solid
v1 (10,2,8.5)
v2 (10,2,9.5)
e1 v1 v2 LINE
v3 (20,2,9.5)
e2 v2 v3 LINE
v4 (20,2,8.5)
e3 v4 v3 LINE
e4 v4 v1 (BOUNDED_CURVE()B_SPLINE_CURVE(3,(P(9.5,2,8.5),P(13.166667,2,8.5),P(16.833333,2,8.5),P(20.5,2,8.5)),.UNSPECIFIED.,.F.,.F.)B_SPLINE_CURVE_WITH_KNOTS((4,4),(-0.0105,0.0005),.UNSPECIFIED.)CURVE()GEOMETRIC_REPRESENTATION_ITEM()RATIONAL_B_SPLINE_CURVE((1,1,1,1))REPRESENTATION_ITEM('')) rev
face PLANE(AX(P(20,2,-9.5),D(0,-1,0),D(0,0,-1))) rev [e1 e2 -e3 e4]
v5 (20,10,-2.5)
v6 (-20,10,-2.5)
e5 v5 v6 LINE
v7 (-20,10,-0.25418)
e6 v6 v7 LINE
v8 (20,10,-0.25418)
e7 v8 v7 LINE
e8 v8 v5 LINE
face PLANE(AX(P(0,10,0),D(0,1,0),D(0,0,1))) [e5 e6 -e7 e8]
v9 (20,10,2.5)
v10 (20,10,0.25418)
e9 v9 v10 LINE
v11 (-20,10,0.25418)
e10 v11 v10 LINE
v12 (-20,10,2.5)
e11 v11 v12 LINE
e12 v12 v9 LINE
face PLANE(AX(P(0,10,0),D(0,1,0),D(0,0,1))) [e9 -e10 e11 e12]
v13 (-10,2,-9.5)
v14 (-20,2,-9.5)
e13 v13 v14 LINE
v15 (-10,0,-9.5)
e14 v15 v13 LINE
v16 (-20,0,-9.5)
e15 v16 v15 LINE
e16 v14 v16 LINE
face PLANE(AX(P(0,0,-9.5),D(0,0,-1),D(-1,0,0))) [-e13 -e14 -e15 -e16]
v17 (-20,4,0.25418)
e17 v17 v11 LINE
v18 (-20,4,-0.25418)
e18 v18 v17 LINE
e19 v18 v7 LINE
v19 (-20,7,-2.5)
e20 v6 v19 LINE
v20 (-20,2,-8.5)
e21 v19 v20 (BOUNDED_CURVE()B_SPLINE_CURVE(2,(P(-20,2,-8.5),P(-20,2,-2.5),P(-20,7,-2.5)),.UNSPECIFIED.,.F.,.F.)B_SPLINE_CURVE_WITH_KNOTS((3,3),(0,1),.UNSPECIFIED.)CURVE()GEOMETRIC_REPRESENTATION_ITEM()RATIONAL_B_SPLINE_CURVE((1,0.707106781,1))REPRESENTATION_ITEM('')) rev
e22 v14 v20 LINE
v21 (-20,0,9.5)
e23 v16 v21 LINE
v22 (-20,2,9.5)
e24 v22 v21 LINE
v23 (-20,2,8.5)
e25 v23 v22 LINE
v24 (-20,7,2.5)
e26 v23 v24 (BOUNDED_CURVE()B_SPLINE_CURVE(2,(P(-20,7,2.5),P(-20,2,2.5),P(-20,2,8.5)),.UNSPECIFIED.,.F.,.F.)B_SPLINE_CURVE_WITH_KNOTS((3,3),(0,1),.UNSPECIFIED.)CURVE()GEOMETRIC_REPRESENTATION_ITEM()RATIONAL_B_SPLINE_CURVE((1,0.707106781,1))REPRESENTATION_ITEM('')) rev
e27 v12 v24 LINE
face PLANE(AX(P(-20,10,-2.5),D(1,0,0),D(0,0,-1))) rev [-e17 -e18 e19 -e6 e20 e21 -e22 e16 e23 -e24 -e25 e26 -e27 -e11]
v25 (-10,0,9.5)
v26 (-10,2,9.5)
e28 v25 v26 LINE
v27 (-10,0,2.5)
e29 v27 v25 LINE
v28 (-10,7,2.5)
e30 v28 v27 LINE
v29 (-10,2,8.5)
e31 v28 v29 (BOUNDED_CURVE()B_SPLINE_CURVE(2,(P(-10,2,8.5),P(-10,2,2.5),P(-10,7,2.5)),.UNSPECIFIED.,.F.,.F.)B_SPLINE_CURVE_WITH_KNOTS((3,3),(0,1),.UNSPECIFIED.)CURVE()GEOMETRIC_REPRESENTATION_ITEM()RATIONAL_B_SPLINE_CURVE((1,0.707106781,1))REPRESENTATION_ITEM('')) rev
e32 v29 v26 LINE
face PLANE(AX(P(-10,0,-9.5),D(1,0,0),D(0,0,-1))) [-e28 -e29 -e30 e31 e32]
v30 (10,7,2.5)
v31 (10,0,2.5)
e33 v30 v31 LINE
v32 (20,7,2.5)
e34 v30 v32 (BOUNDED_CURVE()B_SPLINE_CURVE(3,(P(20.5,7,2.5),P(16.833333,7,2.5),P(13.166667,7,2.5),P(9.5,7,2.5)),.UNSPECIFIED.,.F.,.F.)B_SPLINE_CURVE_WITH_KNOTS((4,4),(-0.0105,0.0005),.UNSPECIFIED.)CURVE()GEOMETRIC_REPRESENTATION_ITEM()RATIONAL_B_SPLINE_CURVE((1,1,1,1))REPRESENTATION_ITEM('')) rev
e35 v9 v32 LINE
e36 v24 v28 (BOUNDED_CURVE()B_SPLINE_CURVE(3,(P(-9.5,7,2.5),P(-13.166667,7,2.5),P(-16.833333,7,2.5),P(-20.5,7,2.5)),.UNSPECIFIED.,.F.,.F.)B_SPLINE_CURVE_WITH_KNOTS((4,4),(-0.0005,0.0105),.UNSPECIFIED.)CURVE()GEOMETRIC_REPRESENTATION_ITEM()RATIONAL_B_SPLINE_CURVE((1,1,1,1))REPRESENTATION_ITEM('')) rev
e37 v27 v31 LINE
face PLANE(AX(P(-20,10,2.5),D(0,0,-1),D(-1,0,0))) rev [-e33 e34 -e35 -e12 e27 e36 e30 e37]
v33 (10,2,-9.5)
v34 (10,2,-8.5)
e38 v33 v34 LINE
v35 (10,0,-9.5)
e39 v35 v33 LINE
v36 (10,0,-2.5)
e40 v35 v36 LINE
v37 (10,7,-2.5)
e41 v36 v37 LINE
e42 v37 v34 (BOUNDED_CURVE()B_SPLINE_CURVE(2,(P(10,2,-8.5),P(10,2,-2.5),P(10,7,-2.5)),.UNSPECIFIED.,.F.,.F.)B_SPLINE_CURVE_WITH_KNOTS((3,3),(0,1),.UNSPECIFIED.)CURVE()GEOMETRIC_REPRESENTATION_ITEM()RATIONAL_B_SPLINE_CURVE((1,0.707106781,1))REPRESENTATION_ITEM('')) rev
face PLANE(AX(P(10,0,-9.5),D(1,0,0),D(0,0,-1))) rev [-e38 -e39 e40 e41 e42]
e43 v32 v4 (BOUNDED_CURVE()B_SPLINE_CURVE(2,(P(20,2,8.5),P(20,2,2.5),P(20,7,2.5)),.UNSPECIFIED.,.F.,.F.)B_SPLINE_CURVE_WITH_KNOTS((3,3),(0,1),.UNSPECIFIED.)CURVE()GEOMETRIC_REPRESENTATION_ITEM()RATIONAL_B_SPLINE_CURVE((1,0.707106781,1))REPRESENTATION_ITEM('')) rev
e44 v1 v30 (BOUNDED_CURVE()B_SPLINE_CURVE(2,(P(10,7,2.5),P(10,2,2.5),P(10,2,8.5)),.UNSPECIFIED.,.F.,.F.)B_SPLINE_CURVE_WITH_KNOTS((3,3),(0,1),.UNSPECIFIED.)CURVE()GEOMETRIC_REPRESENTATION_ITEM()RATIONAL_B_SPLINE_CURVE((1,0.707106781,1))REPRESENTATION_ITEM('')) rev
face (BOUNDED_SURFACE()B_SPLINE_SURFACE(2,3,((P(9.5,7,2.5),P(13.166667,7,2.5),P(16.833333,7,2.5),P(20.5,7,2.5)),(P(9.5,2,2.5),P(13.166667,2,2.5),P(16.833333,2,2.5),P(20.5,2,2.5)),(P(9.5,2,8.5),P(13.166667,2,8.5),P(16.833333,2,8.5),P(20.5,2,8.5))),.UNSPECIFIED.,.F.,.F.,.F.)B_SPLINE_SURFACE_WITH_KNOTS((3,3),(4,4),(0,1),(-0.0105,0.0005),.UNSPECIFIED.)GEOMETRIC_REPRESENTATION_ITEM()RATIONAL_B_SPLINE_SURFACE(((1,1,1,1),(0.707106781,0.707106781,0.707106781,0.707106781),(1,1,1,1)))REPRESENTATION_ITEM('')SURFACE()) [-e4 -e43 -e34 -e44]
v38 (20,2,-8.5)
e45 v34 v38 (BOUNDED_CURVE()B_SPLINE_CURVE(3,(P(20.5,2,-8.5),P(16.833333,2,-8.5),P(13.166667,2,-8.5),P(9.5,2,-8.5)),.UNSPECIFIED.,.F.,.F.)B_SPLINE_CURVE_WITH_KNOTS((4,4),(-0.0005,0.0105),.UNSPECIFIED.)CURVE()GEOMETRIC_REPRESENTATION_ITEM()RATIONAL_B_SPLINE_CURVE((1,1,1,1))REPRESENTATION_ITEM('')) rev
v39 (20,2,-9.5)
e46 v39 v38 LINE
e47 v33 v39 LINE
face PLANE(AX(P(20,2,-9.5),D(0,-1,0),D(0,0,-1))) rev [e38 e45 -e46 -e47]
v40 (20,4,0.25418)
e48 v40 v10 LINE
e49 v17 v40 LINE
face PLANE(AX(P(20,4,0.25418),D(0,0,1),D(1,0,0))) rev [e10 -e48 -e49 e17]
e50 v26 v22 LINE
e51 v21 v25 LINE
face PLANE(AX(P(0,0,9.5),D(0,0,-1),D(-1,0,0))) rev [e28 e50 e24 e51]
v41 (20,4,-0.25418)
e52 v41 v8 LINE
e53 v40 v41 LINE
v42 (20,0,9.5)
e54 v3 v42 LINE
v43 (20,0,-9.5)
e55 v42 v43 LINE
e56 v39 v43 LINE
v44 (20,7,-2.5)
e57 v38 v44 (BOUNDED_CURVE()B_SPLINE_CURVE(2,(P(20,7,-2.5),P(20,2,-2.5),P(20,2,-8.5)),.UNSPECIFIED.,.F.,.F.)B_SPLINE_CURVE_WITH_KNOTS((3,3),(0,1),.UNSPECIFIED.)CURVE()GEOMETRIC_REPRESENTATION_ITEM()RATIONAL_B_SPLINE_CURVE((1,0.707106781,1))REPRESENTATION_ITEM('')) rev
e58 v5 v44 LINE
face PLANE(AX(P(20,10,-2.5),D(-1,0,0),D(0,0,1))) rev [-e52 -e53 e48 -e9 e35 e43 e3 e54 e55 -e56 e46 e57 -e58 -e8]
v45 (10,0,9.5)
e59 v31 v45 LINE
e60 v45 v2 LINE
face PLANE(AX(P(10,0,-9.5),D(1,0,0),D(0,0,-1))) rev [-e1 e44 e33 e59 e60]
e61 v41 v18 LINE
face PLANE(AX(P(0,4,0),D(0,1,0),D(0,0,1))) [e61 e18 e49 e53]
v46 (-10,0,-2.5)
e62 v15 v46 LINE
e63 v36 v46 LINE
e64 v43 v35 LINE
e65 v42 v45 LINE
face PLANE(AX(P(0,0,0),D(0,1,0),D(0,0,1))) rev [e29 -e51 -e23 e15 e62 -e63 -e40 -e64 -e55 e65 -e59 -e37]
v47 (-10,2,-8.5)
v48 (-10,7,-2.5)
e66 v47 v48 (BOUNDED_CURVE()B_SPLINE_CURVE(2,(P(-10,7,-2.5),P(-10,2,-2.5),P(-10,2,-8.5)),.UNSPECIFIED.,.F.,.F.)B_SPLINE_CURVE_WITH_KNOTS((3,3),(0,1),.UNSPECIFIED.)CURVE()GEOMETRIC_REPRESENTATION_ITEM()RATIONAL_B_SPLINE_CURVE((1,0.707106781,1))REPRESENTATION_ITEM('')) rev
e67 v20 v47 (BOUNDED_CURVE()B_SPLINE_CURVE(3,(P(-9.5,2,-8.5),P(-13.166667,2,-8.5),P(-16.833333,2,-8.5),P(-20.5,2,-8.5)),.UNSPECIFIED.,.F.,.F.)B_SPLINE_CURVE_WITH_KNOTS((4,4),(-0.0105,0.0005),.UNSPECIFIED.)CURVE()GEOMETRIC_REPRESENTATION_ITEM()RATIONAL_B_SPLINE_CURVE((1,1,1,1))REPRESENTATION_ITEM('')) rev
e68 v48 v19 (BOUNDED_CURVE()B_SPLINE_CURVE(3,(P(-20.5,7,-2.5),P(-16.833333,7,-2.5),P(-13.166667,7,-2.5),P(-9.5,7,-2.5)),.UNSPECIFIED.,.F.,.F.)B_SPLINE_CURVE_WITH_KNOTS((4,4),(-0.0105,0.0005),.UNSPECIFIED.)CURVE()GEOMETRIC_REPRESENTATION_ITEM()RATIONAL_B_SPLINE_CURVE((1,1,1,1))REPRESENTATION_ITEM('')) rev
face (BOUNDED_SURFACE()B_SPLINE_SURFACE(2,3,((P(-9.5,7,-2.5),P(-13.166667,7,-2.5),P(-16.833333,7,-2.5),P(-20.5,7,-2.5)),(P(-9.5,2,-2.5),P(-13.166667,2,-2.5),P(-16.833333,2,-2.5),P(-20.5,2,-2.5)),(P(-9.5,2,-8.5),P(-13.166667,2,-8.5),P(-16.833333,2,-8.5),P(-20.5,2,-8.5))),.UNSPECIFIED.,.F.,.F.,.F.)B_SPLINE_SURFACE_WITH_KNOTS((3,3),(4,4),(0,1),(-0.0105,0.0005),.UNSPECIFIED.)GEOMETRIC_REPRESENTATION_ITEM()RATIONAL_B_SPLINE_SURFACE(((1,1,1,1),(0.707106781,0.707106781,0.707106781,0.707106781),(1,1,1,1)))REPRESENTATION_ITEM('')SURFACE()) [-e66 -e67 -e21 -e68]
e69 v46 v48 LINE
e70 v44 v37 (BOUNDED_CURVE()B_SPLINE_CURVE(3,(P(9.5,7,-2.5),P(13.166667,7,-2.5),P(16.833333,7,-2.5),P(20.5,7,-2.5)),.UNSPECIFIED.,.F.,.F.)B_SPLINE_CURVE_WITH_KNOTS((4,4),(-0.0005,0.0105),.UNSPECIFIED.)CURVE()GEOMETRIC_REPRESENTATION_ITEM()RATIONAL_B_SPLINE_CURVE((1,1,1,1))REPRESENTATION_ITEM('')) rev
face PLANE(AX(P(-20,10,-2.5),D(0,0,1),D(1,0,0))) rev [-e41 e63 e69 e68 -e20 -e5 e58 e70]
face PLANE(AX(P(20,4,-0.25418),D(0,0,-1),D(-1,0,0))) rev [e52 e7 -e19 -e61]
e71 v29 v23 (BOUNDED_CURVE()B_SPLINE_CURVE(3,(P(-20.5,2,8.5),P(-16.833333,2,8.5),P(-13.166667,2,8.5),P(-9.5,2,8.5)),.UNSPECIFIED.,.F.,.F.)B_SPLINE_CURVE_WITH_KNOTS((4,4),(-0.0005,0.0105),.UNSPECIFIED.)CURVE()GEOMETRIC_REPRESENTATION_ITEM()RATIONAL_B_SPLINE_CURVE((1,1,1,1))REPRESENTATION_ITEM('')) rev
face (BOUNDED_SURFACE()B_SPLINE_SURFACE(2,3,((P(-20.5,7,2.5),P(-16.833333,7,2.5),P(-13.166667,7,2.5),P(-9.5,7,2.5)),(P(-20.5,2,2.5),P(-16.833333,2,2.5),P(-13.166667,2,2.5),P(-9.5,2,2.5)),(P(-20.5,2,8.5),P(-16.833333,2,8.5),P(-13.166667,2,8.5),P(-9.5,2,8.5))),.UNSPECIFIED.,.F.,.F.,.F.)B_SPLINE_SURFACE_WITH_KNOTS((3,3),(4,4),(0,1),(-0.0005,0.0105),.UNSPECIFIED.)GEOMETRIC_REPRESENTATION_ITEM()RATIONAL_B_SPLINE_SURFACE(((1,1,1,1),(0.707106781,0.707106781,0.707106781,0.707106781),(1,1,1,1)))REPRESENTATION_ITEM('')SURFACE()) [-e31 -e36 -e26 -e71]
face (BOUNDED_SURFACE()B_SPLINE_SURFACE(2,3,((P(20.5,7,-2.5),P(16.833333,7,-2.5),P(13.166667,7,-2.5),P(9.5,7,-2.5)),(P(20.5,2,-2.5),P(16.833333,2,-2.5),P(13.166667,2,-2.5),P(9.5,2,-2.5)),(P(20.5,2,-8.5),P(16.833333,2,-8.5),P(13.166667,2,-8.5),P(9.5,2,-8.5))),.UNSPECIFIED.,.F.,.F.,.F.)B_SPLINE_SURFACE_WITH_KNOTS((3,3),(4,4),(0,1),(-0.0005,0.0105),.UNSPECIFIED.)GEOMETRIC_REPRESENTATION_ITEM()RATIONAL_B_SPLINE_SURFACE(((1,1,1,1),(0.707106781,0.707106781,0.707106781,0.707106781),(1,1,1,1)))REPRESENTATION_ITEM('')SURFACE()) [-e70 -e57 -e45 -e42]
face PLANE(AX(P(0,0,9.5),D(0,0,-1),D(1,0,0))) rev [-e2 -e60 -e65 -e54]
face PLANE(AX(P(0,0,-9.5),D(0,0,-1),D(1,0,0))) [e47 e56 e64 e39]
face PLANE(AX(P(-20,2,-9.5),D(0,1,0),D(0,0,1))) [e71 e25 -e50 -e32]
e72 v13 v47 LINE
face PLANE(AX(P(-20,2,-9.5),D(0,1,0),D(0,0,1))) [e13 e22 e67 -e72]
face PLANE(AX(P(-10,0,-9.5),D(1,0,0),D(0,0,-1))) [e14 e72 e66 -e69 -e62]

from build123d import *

# Parameters (mm, degrees)
ESQUISSE1_W             = 40
ESQUISSE1_H             = 5
BOSS_EXTRU_1_DEPTH      = 10
ESQUISSE2_W             = 40
ESQUISSE2_H             = 0.508359338
ENL_V_MAT_EXTRU_1_DEPTH = 6
BOSS_EXTRU_2_START      = -12
ESQUISSE3_W             = 10
ESQUISSE3_H             = 2
BOSS_EXTRU_2_DEPTH      = 19
CONG_1_SIZE             = 6
CONG_1_SIZE_2           = 5
CONG_2_SIZE             = 6
CONG_2_SIZE_2           = 5
CONG_4_SIZE             = 6
CONG_4_SIZE_2           = 5
CONG_5_SIZE             = 6
CONG_5_SIZE_2           = 5


with BuildPart() as part:
    # Esquisse1 → Boss.-Extru.1 (new body)
    with BuildSketch(Plane(origin=(0, 0, 0), x_dir=(1, 0, 0), z_dir=(0, 1, 0))):
        Rectangle(ESQUISSE1_W, ESQUISSE1_H)
    extrude(amount=BOSS_EXTRU_1_DEPTH)

    # Esquisse2 → Enlèv. mat.-Extru.1 (cut)
    with BuildSketch(Plane(origin=(0, 10, 0), x_dir=(1, 0, 0), z_dir=(0, 1, 0))):
        Rectangle(ESQUISSE2_W, ESQUISSE2_H)
    extrude(amount=-ENL_V_MAT_EXTRU_1_DEPTH, mode=Mode.SUBTRACT)

    # Esquisse3 → Boss.-Extru.2 (add)
    with BuildSketch(Plane.XY.offset(2.5).offset(BOSS_EXTRU_2_START)):
        with Locations((-15, 1)):
            Rectangle(ESQUISSE3_W, ESQUISSE3_H)
    boss_extru_2 = extrude(amount=BOSS_EXTRU_2_DEPTH)

    # Symétrie1: Boss.-Extru.2 across plane
    add(boss_extru_2.mirror(Plane(origin=(0, 0, 0), x_dir=(0, 0, 1), z_dir=(1, 0, 0))))

    # Congé1
    # an asymmetric fillet: 6, 5 mm, written as the material it adds along each edge
    with BuildSketch(Plane(origin=(-20, 2, 2.5), x_dir=(0, 0, 1), z_dir=(1, 0, 0))) as cong_1_piece_1:
        with BuildLine():
            Bezier((CONG_1_SIZE, 0), (0, 0), (0, -CONG_1_SIZE_2), weights=[1, 0.707106781, 1])
            Line((0, -CONG_1_SIZE_2), (0, 0))
            Line((0, 0), (CONG_1_SIZE, 0))
        make_face()
    extrude(amount=10)

    # Congé2
    # an asymmetric fillet: 6, 5 mm, written as the material it adds along each edge
    with BuildSketch(Plane(origin=(20, 2, 2.5), x_dir=(0, 0, 1), z_dir=(-1, 0, 0))) as cong_2_piece_1:
        with BuildLine():
            Bezier((CONG_2_SIZE, 0), (0, 0), (0, CONG_2_SIZE_2), weights=[1, 0.707106781, 1])
            Line((0, CONG_2_SIZE_2), (0, 0))
            Line((0, 0), (CONG_2_SIZE, 0))
        make_face()
    extrude(amount=10)

    # Congé4
    # an asymmetric fillet: 6, 5 mm, written as the material it adds along each edge
    with BuildSketch(Plane(origin=(10, 2, -2.5), x_dir=(0, 0, -1), z_dir=(1, 0, 0))) as cong_4_piece_1:
        with BuildLine():
            Bezier((CONG_4_SIZE, 0), (0, 0), (0, CONG_4_SIZE_2), weights=[1, 0.707106781, 1])
            Line((0, CONG_4_SIZE_2), (0, 0))
            Line((0, 0), (CONG_4_SIZE, 0))
        make_face()
    extrude(amount=10)

    # Congé5
    # an asymmetric fillet: 6, 5 mm, written as the material it adds along each edge
    with BuildSketch(Plane(origin=(-10, 2, -2.5), x_dir=(0, 0, -1), z_dir=(-1, 0, 0))) as cong_5_piece_1:
        with BuildLine():
            Bezier((CONG_5_SIZE, 0), (0, 0), (0, -CONG_5_SIZE_2), weights=[1, 0.707106781, 1])
            Line((0, -CONG_5_SIZE_2), (0, 0))
            Line((0, 0), (CONG_5_SIZE, 0))
        make_face()
    extrude(amount=10)


solid = part.part
